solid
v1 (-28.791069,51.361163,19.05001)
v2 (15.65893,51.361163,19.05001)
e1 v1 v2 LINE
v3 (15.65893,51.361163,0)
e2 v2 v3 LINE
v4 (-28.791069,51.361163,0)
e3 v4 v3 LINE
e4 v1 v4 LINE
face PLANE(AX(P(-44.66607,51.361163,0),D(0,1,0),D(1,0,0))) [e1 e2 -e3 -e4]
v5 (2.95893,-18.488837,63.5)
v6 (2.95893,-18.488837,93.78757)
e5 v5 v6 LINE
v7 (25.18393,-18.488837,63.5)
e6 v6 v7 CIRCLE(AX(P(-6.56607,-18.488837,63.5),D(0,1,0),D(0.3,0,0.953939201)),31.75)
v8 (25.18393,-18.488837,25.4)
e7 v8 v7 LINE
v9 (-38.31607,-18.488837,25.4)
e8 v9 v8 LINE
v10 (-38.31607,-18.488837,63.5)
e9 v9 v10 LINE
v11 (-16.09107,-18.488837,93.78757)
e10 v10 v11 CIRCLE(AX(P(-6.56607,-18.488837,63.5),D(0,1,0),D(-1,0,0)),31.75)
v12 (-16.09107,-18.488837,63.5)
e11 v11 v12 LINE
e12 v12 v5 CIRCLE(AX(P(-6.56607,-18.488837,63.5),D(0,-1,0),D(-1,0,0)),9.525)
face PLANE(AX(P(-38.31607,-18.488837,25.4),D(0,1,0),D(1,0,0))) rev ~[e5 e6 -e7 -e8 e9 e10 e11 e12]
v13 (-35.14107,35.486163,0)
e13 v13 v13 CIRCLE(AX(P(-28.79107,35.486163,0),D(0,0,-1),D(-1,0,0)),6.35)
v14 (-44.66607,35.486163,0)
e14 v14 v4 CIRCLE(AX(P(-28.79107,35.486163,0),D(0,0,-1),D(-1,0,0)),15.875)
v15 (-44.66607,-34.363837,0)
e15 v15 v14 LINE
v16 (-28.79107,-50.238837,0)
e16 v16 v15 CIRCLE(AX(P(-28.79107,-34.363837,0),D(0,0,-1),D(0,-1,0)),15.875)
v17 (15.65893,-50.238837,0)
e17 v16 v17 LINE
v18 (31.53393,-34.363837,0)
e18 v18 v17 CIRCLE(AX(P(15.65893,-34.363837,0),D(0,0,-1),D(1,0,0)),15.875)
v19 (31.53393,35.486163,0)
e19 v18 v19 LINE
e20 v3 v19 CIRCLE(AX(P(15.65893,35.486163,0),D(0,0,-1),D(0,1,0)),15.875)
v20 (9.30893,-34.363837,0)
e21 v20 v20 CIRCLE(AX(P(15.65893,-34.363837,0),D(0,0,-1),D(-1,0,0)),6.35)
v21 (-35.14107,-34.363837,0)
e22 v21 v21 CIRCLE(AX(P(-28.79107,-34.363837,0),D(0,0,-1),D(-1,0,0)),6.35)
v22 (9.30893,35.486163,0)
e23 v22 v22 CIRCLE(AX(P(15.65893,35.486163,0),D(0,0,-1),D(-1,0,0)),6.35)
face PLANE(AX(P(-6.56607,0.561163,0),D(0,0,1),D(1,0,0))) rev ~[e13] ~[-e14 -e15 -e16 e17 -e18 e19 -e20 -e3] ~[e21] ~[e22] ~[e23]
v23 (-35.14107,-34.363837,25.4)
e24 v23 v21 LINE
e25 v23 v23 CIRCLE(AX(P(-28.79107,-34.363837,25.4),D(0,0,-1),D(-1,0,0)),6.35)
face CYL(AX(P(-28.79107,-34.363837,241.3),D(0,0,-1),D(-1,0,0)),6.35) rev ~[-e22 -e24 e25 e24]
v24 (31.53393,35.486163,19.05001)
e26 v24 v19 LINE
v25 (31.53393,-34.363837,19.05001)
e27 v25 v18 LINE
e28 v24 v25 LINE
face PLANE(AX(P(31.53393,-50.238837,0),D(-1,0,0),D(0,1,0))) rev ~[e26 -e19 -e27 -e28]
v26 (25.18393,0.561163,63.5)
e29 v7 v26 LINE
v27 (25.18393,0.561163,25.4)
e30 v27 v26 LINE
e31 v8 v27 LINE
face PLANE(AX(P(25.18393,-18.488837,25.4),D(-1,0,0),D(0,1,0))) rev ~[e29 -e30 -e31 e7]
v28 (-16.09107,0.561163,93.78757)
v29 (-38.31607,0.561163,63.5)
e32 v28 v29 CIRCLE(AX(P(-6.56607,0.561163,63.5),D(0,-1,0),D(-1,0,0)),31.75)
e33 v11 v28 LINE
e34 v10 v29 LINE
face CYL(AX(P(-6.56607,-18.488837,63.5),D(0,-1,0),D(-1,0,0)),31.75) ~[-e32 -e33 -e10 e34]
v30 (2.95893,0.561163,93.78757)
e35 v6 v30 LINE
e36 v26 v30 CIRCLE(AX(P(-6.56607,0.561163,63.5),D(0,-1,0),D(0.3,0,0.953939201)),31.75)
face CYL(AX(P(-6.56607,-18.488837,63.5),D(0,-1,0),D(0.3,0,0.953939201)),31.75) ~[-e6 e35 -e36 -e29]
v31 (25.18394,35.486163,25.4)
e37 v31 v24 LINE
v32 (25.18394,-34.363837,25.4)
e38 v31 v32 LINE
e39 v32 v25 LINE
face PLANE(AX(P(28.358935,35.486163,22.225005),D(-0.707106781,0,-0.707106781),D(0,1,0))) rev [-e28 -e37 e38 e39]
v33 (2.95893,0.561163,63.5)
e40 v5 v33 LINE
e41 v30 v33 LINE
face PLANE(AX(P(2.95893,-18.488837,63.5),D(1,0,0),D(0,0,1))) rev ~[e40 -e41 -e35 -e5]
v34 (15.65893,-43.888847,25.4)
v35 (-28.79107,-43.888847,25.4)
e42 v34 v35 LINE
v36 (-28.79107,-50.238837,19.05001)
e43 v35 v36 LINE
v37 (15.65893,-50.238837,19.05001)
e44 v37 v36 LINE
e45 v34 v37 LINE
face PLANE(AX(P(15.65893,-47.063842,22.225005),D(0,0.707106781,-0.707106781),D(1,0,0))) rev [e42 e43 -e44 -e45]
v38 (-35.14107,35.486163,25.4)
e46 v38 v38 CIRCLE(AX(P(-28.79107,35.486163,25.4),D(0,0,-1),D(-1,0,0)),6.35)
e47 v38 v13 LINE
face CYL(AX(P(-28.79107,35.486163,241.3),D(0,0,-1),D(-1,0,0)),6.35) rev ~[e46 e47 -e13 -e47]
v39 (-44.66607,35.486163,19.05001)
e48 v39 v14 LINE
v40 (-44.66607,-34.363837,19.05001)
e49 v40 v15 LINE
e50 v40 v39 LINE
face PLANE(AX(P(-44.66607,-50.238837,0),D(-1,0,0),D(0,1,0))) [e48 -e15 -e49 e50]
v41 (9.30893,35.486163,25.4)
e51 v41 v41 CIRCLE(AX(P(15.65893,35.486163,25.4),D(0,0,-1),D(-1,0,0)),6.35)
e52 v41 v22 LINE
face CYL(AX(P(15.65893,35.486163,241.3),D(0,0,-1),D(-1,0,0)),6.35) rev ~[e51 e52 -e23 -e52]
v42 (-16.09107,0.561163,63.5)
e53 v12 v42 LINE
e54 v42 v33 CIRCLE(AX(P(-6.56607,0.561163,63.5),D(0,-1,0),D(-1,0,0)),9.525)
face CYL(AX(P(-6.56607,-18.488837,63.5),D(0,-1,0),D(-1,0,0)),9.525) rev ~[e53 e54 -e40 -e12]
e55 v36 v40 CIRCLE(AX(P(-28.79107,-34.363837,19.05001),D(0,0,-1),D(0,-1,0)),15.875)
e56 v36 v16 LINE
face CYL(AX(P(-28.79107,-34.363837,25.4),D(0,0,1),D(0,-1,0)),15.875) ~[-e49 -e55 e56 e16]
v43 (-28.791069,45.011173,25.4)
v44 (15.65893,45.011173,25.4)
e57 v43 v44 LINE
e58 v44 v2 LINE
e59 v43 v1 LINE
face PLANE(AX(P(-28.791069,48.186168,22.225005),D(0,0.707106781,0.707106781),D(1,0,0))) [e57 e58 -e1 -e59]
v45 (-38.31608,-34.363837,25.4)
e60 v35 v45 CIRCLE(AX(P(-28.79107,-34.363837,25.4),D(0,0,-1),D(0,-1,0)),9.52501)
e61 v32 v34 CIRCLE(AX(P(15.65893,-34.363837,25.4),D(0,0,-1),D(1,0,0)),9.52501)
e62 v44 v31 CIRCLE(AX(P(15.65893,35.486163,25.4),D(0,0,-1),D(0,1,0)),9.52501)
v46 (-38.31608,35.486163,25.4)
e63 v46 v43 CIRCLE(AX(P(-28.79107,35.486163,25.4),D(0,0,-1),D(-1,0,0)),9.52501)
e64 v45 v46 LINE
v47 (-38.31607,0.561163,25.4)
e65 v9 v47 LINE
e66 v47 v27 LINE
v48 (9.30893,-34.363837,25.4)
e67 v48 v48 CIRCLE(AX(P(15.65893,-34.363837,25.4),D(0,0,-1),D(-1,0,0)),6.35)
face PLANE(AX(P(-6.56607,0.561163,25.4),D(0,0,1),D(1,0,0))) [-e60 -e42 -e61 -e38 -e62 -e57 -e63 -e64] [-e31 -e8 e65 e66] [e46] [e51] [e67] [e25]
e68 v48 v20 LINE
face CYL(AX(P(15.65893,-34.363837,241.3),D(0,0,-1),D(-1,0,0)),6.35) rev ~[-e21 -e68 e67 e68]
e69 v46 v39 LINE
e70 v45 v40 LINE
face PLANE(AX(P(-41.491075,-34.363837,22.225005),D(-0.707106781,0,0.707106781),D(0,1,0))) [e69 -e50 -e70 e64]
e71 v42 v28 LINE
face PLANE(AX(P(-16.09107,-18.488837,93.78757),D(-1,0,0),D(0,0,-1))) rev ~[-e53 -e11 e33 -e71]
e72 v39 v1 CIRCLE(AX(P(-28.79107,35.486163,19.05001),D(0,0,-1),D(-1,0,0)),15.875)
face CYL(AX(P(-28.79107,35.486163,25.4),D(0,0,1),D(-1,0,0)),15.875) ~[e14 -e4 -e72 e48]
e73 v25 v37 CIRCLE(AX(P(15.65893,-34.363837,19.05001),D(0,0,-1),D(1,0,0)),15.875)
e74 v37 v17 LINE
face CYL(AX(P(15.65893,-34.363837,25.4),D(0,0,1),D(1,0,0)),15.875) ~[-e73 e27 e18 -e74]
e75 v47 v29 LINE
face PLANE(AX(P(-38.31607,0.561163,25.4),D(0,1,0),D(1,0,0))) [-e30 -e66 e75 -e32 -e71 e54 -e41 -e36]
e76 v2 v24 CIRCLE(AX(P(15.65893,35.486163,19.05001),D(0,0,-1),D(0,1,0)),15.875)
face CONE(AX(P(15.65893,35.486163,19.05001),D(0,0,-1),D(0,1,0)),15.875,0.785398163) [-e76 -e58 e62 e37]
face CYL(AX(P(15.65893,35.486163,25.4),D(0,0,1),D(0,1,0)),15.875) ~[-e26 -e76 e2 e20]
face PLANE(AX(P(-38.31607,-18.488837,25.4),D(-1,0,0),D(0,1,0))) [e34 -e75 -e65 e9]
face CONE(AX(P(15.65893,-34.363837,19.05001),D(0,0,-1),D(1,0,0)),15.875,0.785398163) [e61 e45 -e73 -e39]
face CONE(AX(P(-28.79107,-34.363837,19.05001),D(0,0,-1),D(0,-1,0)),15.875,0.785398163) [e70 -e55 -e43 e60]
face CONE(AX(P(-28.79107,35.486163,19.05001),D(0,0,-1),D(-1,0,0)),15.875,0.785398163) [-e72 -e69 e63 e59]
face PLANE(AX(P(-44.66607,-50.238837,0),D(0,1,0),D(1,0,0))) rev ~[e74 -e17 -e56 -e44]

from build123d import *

# Parameters (mm, degrees)
F0_W     = 76.2
F0_H     = 101.6
F1_DEPTH = 25.4
F2_W     = 63.5
F2_H     = 19.05
F3_DEPTH = 76.2
F5_DEPTH = 54.60239
F6_DEPTH = 25.4
F8_D     = 12.7
F8_DEPTH = 215.9
F8_TIP   = 3.8154649308
F9_DEPTH = 25.4
F10_SIZE = 6.34999


# Not quite as in the source:
# - a fillet or chamfer is up to 0.001 mm smaller than in the source, because OpenCascade refuses the exact size


with BuildPart() as f1:
    # F0 (on Top) → F1 (new body)
    with BuildSketch(Plane.XY):
        with Locations((-6.5660695493, 0.5611634433)):
            Rectangle(F0_W, F0_H)
    extrude(amount=F1_DEPTH)

    # F2 (on face) → F3 (join)
    with BuildSketch(Plane.XY.offset(25.4)):
        with Locations((-6.5660695493, -8.9638365567)):
            Rectangle(F2_W, F2_H)
    extrude(amount=F3_DEPTH)

    # F4 (on face) → F5 (cut)
    with BuildSketch(Plane.XZ.offset(18.4888365567)):
        with BuildLine():
            Line((-38.3160695493, 101.6), (-38.3160695493, 63.5))
            ThreePointArc((-38.3160695493, 63.5), (-32.1637379002, 82.2835533113), (-16.0910695493, 93.787569645))
            Line((-16.0910695493, 93.787569645), (-16.0910695493, 101.6))
            Line((-16.0910695493, 101.6), (-38.3160695493, 101.6))
        make_face()
        with BuildLine():
            ThreePointArc((-16.0910695493, 93.787569645), (-6.5660695493, 95.25), (2.9589304507, 93.787569645))
            Line((2.9589304507, 93.787569645), (2.9589304507, 101.6))
            Line((2.9589304507, 101.6), (-16.0910695493, 101.6))
            Line((-16.0910695493, 101.6), (-16.0910695493, 93.787569645))
        make_face()
        with BuildLine():
            ThreePointArc((2.9589304507, 93.787569645), (19.0315988015, 82.2835533113), (25.1839304507, 63.5))
            Line((25.1839304507, 63.5), (25.1839304507, 101.6))
            Line((25.1839304507, 101.6), (2.9589304507, 101.6))
            Line((2.9589304507, 101.6), (2.9589304507, 93.787569645))
        make_face()
    extrude(amount=-F5_DEPTH, mode=Mode.SUBTRACT)

    # F4 (on face) → F6 (cut)
    with BuildSketch(Plane.XZ.offset(18.4888365567)):
        with BuildLine():
            Line((2.9589304507, 63.5), (2.9589304507, 93.787569645))
            ThreePointArc((2.9589304507, 93.787569645), (-6.5660695493, 95.25), (-16.0910695493, 93.787569645))
            Line((-16.0910695493, 93.787569645), (-16.0910695493, 63.5))
            ThreePointArc((-16.0910695493, 63.5), (-6.5660695493, 73.025), (2.9589304507, 63.5))
        make_face()
        with BuildLine():
            ThreePointArc((-16.0910695493, 63.5), (-13.3012616401, 56.7648079092), (-6.5660695493, 53.975))
            ThreePointArc((-6.5660695493, 53.975), (0.1691225415, 56.7648079092), (2.9589304507, 63.5))
            ThreePointArc((2.9589304507, 63.5), (-6.5660695493, 73.025), (-16.0910695493, 63.5))
        make_face()
    extrude(amount=-F6_DEPTH, mode=Mode.SUBTRACT)

    # F8
    with Locations(Plane.XY.offset(25.4)):
        with Locations((-28.7910695493, 35.4861634433), (15.6589304507, 35.4861634433), (15.6589304507, -34.3638365567), (-28.7910695493, -34.3638365567)):
            Hole(F8_D / 2, depth=F8_DEPTH)
            with Locations((0, 0, -(F8_DEPTH + F8_TIP / 2))):  # 118° drill point
                Cone(0, F8_D / 2, F8_TIP, mode=Mode.SUBTRACT)

    # F7 (on face) → F9 (cut)
    with BuildSketch(Plane.XY.offset(25.4)):
        with BuildLine():
            ThreePointArc((-44.6660695493, 35.4861634433), (-40.0163896548, 46.7114836405), (-28.7910694197, 51.3611634433))
            Line((-28.7910694197, 51.3611634433), (-44.6660695493, 51.3611634433))
            Line((-44.6660695493, 51.3611634433), (-44.6660695493, 35.4861634433))
        make_face()
        with BuildLine():
            Line((31.5339304507, 51.3611634433), (15.6589304507, 51.3611634433))
            ThreePointArc((15.6589304507, 51.3611634433), (26.884250602, 46.7114835947), (31.5339304507, 35.4861634433))
            Line((31.5339304507, 35.4861634433), (31.5339304507, 51.3611634433))
        make_face()
        with BuildLine():
            Line((31.5339304507, -50.2388365567), (31.5339304507, -34.3638365567))
            ThreePointArc((31.5339304507, -34.3638365567), (26.8842505737, -45.5891567363), (15.6589303706, -50.2388365567))
            Line((15.6589303706, -50.2388365567), (31.5339304507, -50.2388365567))
        make_face()
        with BuildLine():
            ThreePointArc((-28.7910695493, -50.2388365567), (-40.0163897007, -45.589156708), (-44.6660695493, -34.3638365567))
            Line((-44.6660695493, -34.3638365567), (-44.6660695493, -50.2388365567))
            Line((-44.6660695493, -50.2388365567), (-28.7910695493, -50.2388365567))
        make_face()
    extrude(amount=-F9_DEPTH, mode=Mode.SUBTRACT)

    # F10 (size 6.35 in the source; OpenCascade refuses exactly that, so slightly less here)
    f10_edges = [f1.edges().sort_by_distance(p)[0] for p in [
        (26.884251, -45.589157, 25.4),
        (31.53393, 0.561163, 25.4),
        (26.884251, 46.711484, 25.4),
        (-6.566069, 51.361163, 25.4),
        (-40.01639, 46.711484, 25.4),
        (-44.66607, 0.561163, 25.4),
        (-40.01639, -45.589157, 25.4),
        (-6.56607, -50.238837, 25.4),
    ]]
    chamfer(f10_edges, length=F10_SIZE)


solid = f1.part
